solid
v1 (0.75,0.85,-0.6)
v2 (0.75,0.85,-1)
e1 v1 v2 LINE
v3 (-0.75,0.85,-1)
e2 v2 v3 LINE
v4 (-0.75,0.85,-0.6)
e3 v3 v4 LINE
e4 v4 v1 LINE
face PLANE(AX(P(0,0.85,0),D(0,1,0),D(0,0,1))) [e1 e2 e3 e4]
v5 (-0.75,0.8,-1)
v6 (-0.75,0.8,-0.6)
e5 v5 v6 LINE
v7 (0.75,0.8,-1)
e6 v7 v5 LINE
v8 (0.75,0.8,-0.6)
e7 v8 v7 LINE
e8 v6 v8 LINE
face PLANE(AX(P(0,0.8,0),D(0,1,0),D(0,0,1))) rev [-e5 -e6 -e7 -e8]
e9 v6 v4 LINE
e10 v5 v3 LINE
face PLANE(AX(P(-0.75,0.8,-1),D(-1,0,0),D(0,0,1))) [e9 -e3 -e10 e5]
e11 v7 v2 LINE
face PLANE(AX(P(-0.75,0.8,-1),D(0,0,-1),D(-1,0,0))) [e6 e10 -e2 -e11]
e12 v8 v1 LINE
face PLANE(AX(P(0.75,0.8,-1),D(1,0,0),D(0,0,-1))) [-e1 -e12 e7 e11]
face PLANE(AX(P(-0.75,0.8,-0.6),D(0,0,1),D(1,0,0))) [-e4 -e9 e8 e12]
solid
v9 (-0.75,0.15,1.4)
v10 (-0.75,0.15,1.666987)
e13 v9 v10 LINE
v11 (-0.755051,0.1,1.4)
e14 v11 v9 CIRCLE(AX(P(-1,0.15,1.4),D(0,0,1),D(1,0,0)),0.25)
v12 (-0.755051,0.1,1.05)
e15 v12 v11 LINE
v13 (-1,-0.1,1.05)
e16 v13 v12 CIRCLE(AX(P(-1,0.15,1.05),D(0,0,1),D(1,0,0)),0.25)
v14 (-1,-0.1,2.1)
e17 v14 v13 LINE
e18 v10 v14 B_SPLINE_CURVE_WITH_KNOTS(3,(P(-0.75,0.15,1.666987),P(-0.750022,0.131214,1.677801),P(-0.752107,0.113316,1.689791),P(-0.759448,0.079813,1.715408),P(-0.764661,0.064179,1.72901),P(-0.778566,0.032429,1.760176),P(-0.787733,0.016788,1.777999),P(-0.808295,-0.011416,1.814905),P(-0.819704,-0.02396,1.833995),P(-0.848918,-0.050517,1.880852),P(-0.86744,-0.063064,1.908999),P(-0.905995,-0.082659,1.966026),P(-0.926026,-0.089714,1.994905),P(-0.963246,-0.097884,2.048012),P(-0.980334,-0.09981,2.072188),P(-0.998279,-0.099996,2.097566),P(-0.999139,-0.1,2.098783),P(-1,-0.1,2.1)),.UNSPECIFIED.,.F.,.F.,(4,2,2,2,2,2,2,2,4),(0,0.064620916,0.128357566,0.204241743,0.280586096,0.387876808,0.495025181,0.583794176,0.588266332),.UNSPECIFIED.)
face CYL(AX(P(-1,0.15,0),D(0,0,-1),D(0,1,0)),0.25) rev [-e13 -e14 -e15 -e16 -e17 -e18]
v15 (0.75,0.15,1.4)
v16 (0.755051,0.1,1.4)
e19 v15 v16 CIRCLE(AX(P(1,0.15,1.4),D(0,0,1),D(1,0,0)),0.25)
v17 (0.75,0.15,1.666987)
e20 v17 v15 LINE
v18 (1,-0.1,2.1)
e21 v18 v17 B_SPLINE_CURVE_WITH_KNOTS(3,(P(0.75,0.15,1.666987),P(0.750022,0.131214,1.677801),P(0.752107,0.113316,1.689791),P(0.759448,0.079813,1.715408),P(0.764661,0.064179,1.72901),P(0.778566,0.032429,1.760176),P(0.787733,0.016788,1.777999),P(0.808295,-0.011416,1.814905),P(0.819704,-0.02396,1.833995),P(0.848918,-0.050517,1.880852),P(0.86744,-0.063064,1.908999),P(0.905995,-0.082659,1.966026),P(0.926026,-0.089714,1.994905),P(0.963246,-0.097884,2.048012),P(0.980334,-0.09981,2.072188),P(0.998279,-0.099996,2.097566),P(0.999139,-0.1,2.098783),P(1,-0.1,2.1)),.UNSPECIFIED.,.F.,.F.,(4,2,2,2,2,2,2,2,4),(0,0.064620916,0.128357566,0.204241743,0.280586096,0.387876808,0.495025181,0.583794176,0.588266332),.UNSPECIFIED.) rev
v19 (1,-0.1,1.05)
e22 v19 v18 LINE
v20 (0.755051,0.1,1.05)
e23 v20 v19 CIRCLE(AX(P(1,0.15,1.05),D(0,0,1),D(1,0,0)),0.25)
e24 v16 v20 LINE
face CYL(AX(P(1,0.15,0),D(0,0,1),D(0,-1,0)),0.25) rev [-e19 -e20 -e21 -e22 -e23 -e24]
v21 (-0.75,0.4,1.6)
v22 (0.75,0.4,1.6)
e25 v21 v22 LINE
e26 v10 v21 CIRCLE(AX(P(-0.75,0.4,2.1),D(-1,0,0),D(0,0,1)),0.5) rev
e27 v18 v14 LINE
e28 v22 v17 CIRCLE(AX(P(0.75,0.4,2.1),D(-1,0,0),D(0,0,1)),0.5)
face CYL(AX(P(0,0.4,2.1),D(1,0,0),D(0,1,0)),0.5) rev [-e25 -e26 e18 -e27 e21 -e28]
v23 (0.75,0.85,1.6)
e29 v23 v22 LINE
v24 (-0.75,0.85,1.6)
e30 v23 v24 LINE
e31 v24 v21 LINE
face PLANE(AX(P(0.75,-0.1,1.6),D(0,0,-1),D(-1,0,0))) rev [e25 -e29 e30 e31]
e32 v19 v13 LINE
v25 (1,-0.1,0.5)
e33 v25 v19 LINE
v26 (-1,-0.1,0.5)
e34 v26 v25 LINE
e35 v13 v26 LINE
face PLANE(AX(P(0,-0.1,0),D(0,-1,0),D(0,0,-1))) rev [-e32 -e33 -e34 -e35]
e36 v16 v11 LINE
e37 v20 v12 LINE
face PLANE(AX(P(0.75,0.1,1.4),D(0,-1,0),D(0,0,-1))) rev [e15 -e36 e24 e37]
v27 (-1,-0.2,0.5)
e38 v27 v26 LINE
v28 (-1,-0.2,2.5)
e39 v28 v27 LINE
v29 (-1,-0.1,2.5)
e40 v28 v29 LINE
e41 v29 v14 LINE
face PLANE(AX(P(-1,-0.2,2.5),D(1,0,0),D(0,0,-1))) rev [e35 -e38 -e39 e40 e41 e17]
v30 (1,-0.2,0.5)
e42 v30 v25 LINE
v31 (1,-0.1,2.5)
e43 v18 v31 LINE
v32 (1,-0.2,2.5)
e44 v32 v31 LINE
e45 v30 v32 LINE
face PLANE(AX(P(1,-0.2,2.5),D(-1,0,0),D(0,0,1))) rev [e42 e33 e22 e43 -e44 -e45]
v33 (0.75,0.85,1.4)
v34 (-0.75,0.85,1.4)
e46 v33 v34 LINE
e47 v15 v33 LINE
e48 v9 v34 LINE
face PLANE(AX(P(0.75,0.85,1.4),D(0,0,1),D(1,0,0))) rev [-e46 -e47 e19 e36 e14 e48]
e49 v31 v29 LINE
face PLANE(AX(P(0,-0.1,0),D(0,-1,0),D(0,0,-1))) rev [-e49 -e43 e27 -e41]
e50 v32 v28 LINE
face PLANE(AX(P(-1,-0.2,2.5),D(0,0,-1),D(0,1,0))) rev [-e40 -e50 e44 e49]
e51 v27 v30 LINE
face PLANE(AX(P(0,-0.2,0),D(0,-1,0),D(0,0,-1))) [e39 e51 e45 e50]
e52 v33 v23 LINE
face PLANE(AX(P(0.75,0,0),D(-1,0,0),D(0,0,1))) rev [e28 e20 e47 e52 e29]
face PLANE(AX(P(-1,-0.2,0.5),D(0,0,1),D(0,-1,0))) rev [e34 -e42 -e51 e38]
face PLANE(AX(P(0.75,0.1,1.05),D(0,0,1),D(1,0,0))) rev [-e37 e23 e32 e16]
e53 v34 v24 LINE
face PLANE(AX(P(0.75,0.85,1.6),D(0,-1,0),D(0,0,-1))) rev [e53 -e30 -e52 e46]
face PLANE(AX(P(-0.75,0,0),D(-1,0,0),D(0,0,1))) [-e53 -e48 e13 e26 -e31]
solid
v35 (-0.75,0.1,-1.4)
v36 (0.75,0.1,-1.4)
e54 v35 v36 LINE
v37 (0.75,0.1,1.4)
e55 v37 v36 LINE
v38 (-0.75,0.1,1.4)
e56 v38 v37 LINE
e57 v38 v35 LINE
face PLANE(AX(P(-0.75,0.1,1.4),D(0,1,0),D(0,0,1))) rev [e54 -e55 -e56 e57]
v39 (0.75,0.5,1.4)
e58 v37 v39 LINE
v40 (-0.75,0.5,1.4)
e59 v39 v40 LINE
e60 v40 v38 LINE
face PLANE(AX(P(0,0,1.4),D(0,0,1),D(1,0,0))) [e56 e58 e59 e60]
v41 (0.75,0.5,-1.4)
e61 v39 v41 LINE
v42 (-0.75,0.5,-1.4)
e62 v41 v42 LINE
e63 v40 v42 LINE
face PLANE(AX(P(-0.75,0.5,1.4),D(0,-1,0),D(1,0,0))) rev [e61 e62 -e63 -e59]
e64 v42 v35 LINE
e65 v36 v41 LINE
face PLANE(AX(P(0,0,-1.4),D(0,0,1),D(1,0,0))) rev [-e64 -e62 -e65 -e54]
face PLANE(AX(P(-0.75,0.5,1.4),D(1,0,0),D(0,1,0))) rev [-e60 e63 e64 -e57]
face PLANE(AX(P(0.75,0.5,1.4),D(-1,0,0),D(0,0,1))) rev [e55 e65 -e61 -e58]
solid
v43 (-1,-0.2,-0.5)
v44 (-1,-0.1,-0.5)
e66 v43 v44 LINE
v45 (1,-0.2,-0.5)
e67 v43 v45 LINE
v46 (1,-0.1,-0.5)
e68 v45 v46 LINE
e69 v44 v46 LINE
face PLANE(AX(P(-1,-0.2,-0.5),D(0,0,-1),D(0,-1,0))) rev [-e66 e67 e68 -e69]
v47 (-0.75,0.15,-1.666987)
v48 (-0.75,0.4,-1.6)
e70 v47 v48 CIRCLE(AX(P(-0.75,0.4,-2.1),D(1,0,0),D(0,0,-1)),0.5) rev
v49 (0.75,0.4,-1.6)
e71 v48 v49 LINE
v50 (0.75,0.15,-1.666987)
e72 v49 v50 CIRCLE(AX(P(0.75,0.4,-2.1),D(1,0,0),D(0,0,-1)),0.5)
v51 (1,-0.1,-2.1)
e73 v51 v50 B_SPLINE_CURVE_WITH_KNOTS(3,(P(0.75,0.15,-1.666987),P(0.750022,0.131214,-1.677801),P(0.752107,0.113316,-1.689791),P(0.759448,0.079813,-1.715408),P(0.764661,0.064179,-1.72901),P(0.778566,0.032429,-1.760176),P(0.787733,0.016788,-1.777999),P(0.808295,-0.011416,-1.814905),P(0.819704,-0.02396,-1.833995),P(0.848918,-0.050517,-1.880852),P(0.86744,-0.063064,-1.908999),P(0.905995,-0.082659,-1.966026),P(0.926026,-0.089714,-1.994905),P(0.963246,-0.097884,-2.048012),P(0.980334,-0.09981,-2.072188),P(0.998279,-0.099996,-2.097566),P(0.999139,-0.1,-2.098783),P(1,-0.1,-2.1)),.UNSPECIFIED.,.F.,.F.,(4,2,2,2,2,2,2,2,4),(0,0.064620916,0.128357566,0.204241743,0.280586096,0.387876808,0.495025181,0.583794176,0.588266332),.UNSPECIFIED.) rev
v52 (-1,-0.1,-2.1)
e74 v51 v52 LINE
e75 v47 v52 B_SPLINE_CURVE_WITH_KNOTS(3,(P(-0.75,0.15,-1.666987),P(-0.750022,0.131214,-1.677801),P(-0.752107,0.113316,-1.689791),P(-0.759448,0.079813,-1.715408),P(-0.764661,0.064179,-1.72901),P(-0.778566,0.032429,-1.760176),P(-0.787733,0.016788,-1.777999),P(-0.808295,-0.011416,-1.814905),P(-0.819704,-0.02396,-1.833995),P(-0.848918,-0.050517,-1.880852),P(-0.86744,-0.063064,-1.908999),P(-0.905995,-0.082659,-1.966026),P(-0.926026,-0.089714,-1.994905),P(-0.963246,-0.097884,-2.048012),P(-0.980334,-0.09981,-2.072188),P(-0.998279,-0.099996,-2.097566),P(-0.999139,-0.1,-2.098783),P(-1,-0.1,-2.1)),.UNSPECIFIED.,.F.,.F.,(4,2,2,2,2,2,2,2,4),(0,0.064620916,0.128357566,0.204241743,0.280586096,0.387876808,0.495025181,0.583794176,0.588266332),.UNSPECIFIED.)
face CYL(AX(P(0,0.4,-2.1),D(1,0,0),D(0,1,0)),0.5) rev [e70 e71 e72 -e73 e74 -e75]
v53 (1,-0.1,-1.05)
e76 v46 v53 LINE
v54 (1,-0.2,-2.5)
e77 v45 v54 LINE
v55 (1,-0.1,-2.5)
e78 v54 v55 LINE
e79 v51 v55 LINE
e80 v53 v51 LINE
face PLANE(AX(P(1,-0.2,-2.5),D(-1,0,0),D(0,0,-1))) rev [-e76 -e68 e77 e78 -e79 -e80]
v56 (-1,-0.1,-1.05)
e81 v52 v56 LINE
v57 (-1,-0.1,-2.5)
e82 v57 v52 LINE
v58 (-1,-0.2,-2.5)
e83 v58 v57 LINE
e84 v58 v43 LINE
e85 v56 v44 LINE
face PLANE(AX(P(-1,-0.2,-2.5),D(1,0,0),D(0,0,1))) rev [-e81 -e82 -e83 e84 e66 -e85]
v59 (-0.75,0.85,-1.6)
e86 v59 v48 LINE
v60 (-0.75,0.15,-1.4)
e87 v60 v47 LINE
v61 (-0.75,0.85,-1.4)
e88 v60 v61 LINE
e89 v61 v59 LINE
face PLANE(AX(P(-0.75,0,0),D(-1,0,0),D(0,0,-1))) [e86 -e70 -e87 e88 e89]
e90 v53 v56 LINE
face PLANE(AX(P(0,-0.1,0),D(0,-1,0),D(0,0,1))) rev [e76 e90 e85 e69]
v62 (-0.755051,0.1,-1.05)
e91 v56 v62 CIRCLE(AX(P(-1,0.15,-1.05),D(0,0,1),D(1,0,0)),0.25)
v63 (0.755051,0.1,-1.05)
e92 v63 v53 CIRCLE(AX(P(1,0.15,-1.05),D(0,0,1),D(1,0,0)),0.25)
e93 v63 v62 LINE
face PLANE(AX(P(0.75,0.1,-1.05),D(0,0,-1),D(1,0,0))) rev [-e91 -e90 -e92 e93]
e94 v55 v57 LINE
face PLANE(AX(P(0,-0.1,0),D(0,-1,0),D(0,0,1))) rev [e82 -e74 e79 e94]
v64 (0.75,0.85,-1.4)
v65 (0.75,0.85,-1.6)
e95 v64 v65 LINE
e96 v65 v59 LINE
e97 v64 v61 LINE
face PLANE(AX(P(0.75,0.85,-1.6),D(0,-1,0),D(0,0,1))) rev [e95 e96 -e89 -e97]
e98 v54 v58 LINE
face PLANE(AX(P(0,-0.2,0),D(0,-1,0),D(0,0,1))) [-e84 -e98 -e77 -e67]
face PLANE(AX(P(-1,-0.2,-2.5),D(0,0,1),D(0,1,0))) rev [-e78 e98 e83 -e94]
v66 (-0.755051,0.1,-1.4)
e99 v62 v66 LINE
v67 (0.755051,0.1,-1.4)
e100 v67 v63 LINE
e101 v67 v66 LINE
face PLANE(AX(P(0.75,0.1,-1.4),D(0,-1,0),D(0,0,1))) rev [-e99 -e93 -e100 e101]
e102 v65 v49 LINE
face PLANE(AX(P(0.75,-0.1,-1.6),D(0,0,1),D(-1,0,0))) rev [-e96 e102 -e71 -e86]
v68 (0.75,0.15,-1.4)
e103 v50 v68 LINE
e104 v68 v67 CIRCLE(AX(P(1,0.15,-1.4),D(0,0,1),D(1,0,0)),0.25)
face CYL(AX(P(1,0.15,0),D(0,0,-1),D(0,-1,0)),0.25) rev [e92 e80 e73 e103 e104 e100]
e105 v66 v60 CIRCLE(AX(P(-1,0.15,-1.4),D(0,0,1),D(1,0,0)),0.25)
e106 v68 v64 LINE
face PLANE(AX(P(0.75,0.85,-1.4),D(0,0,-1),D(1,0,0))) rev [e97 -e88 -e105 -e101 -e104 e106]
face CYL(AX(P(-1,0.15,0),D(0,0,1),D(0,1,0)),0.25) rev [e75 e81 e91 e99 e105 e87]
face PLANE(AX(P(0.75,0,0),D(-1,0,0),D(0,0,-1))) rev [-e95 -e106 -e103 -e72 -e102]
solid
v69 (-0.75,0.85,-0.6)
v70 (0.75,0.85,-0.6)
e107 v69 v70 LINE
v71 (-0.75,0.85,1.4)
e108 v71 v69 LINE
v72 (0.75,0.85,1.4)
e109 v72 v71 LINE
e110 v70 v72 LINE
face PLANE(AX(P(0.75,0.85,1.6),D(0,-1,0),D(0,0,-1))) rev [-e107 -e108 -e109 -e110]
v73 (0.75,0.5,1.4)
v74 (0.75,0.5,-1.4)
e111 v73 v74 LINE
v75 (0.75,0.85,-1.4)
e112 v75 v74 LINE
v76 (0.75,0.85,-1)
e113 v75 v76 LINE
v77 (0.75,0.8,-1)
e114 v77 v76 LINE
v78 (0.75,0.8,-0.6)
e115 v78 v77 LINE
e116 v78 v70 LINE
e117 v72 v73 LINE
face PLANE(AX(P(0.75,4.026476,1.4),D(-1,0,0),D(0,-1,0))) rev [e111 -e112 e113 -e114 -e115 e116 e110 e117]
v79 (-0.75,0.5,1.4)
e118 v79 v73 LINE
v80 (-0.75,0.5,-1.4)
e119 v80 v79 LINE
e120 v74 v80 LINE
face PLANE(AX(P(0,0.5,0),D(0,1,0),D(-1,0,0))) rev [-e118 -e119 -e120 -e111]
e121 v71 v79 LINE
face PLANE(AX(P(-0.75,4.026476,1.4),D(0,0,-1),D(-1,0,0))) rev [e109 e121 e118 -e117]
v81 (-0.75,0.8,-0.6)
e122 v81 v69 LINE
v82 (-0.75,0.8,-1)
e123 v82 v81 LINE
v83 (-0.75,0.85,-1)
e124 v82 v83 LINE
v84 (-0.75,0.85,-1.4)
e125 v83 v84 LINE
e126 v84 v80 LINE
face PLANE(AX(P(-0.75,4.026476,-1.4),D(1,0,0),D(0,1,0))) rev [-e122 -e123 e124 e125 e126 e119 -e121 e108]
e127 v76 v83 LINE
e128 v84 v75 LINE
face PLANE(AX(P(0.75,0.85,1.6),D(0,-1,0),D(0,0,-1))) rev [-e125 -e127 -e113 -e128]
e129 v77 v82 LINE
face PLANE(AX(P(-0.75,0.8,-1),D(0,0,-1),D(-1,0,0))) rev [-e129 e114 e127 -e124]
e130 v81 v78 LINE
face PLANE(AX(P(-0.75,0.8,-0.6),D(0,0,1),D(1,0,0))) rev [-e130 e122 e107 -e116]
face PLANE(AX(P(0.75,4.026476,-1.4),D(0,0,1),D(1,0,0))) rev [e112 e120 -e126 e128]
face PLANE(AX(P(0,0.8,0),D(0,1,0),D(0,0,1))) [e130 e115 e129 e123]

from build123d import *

# Parameters (mm, degrees)
SKETCH1_W           = 1.5
SKETCH1_H           = 0.4
BOSS_EXTRUDE1_DEPTH = 1.4
BOSS_EXTRUDE2_DEPTH = 0.75
SKETCH3_W           = 1.5
SKETCH3_H           = 2.8
BOSS_EXTRUDE3_DEPTH = 0.35
SKETCH4_W           = 2
SKETCH4_H           = 2
BOSS_EXTRUDE4_DEPTH = 0.1
SKETCH5_W           = 1.5
SKETCH5_H           = 0.4
CUT_EXTRUDE1_DEPTH  = 0.05
SKETCH5_2_W         = 1.5
SKETCH5_2_H         = 0.4
BOSS_EXTRUDE5_DEPTH = 0.05
FILLET1_R           = 0.5
FILLET2_START       = 1.05
FILLET2_DEPTH       = 0.5499999
FILLET2_START_2     = 1.5999999
FILLET2_2_DEPTH     = 0.5000001
FILLET2_START_3     = -2
FILLET2_3_OUTLINE_W = 0.05
FILLET2_3_OUTLINE_H = 0.35
FILLET2_3_DEPTH     = 4


with BuildPart() as part:
    # Sketch1 → Boss-Extrude1 (new, symmetric)
    with BuildSketch(Plane.XY):
        with Locations((0, 0.3)):
            Rectangle(SKETCH1_W, SKETCH1_H)
    extrude(amount=BOSS_EXTRUDE1_DEPTH, both=True)


with BuildPart() as body_2:
    # Sketch2 → Boss-Extrude2 (new, symmetric)
    with BuildSketch(Plane(origin=(0, 0, 0), x_dir=(0, 0, -1), z_dir=(1, 0, 0))):
        Polygon((-1.6, 0.85), (-1.4, 0.85), (-1.4, 0.1), (-1.05, 0.1), (-1.05, -0.1), (-1.6, -0.1), align=None)
    extrude(amount=BOSS_EXTRUDE2_DEPTH, both=True)

    # Sketch4 → Boss-Extrude4 (add)
    with BuildSketch(Plane.XZ.offset(0.1)):
        with Locations((0, 1.5)):
            Rectangle(SKETCH4_W, SKETCH4_H)
    extrude(amount=BOSS_EXTRUDE4_DEPTH)

    # Fillet1
    fillet1_edges = [body_2.edges().sort_by_distance(p)[0] for p in [
        (0, -0.1, 1.6),
    ]]
    fillet(fillet1_edges, radius=FILLET1_R)

    # Fillet2: read off the stored shape, not the designer's step
    # Fillet2 outline → Fillet2 (add)
    with BuildSketch(Plane.XY.offset(FILLET2_START)):
        with BuildLine():
            Line((-0.75, -0.1), (-0.75, 0.15))
            ThreePointArc((-0.75, 0.15), (-0.823223305, -0.026776695), (-1, -0.1))
            Line((-1, -0.1), (-0.75, -0.1))
        make_face()
        with BuildLine():
            Line((0.75, 0.15), (0.75, -0.1))
            Line((0.75, -0.1), (1, -0.1))
            ThreePointArc((1, -0.1), (0.823223305, -0.026776695), (0.75, 0.15))
        make_face()
    extrude(amount=FILLET2_DEPTH)

    # Fillet2 2 outline → Fillet2 2 (add)
    with BuildSketch(Plane.XY.offset(FILLET2_START_2)):
        with BuildLine():
            Line((-0.75, -0.1), (-0.75, 0.15))
            ThreePointArc((-0.75, 0.15), (-0.823223305, -0.026776695), (-1, -0.1))
            Line((-1, -0.1), (-0.75, -0.1))
        make_face()
        with BuildLine():
            Line((0.75, 0.15), (0.75, -0.1))
            Line((0.75, -0.1), (1, -0.1))
            ThreePointArc((1, -0.1), (0.823223305, -0.026776695), (0.75, 0.15))
        make_face()
    extrude(amount=FILLET2_2_DEPTH)

    # Fillet2 3 outline → Fillet2 3 (cut)
    with BuildSketch(Plane.YZ.offset(FILLET2_START_3)):
        with BuildLine():
            ThreePointArc((-0.1, 2.1), (-0.033012702, 1.85), (0.15, 1.666987298))
            Line((0.15, 1.666987298), (0.15, 2.1))
            Line((0.15, 2.1), (-0.1, 2.1))
        make_face()
        with Locations((0.125, 1.225)):
            Rectangle(FILLET2_3_OUTLINE_W, FILLET2_3_OUTLINE_H)
    extrude(amount=FILLET2_3_DEPTH, mode=Mode.SUBTRACT)


with BuildPart() as body_3:
    # Sketch3 → Boss-Extrude3 (new body)
    with BuildSketch(Plane(origin=(0, 0.5, 0), x_dir=(1, 0, 0), z_dir=(0, 1, 0))):
        Rectangle(SKETCH3_W, SKETCH3_H)
    extrude(amount=BOSS_EXTRUDE3_DEPTH)

    # Sketch5 → Cut-Extrude1 (cut)
    with BuildSketch(Plane(origin=(0, 0.85, 0), x_dir=(1, 0, 0), z_dir=(0, 1, 0))):
        with Locations((0, 0.8)):
            Rectangle(SKETCH5_W, SKETCH5_H)
    extrude(amount=-CUT_EXTRUDE1_DEPTH, mode=Mode.SUBTRACT)


with BuildPart() as body_4:
    # Sketch5<2> → Boss-Extrude5 (new body)
    with BuildSketch(Plane(origin=(0, 0.85, 0), x_dir=(1, 0, 0), z_dir=(0, 1, 0))):
        with Locations((0, 0.8)):
            Rectangle(SKETCH5_2_W, SKETCH5_2_H)
    extrude(amount=-BOSS_EXTRUDE5_DEPTH)


with BuildPart() as body_5:
    # Mirror1: mirrored copy
    add(body_2.part.mirror(Plane.XY))


solid = Compound([part.part, body_2.part, body_3.part, body_4.part, body_5.part])
